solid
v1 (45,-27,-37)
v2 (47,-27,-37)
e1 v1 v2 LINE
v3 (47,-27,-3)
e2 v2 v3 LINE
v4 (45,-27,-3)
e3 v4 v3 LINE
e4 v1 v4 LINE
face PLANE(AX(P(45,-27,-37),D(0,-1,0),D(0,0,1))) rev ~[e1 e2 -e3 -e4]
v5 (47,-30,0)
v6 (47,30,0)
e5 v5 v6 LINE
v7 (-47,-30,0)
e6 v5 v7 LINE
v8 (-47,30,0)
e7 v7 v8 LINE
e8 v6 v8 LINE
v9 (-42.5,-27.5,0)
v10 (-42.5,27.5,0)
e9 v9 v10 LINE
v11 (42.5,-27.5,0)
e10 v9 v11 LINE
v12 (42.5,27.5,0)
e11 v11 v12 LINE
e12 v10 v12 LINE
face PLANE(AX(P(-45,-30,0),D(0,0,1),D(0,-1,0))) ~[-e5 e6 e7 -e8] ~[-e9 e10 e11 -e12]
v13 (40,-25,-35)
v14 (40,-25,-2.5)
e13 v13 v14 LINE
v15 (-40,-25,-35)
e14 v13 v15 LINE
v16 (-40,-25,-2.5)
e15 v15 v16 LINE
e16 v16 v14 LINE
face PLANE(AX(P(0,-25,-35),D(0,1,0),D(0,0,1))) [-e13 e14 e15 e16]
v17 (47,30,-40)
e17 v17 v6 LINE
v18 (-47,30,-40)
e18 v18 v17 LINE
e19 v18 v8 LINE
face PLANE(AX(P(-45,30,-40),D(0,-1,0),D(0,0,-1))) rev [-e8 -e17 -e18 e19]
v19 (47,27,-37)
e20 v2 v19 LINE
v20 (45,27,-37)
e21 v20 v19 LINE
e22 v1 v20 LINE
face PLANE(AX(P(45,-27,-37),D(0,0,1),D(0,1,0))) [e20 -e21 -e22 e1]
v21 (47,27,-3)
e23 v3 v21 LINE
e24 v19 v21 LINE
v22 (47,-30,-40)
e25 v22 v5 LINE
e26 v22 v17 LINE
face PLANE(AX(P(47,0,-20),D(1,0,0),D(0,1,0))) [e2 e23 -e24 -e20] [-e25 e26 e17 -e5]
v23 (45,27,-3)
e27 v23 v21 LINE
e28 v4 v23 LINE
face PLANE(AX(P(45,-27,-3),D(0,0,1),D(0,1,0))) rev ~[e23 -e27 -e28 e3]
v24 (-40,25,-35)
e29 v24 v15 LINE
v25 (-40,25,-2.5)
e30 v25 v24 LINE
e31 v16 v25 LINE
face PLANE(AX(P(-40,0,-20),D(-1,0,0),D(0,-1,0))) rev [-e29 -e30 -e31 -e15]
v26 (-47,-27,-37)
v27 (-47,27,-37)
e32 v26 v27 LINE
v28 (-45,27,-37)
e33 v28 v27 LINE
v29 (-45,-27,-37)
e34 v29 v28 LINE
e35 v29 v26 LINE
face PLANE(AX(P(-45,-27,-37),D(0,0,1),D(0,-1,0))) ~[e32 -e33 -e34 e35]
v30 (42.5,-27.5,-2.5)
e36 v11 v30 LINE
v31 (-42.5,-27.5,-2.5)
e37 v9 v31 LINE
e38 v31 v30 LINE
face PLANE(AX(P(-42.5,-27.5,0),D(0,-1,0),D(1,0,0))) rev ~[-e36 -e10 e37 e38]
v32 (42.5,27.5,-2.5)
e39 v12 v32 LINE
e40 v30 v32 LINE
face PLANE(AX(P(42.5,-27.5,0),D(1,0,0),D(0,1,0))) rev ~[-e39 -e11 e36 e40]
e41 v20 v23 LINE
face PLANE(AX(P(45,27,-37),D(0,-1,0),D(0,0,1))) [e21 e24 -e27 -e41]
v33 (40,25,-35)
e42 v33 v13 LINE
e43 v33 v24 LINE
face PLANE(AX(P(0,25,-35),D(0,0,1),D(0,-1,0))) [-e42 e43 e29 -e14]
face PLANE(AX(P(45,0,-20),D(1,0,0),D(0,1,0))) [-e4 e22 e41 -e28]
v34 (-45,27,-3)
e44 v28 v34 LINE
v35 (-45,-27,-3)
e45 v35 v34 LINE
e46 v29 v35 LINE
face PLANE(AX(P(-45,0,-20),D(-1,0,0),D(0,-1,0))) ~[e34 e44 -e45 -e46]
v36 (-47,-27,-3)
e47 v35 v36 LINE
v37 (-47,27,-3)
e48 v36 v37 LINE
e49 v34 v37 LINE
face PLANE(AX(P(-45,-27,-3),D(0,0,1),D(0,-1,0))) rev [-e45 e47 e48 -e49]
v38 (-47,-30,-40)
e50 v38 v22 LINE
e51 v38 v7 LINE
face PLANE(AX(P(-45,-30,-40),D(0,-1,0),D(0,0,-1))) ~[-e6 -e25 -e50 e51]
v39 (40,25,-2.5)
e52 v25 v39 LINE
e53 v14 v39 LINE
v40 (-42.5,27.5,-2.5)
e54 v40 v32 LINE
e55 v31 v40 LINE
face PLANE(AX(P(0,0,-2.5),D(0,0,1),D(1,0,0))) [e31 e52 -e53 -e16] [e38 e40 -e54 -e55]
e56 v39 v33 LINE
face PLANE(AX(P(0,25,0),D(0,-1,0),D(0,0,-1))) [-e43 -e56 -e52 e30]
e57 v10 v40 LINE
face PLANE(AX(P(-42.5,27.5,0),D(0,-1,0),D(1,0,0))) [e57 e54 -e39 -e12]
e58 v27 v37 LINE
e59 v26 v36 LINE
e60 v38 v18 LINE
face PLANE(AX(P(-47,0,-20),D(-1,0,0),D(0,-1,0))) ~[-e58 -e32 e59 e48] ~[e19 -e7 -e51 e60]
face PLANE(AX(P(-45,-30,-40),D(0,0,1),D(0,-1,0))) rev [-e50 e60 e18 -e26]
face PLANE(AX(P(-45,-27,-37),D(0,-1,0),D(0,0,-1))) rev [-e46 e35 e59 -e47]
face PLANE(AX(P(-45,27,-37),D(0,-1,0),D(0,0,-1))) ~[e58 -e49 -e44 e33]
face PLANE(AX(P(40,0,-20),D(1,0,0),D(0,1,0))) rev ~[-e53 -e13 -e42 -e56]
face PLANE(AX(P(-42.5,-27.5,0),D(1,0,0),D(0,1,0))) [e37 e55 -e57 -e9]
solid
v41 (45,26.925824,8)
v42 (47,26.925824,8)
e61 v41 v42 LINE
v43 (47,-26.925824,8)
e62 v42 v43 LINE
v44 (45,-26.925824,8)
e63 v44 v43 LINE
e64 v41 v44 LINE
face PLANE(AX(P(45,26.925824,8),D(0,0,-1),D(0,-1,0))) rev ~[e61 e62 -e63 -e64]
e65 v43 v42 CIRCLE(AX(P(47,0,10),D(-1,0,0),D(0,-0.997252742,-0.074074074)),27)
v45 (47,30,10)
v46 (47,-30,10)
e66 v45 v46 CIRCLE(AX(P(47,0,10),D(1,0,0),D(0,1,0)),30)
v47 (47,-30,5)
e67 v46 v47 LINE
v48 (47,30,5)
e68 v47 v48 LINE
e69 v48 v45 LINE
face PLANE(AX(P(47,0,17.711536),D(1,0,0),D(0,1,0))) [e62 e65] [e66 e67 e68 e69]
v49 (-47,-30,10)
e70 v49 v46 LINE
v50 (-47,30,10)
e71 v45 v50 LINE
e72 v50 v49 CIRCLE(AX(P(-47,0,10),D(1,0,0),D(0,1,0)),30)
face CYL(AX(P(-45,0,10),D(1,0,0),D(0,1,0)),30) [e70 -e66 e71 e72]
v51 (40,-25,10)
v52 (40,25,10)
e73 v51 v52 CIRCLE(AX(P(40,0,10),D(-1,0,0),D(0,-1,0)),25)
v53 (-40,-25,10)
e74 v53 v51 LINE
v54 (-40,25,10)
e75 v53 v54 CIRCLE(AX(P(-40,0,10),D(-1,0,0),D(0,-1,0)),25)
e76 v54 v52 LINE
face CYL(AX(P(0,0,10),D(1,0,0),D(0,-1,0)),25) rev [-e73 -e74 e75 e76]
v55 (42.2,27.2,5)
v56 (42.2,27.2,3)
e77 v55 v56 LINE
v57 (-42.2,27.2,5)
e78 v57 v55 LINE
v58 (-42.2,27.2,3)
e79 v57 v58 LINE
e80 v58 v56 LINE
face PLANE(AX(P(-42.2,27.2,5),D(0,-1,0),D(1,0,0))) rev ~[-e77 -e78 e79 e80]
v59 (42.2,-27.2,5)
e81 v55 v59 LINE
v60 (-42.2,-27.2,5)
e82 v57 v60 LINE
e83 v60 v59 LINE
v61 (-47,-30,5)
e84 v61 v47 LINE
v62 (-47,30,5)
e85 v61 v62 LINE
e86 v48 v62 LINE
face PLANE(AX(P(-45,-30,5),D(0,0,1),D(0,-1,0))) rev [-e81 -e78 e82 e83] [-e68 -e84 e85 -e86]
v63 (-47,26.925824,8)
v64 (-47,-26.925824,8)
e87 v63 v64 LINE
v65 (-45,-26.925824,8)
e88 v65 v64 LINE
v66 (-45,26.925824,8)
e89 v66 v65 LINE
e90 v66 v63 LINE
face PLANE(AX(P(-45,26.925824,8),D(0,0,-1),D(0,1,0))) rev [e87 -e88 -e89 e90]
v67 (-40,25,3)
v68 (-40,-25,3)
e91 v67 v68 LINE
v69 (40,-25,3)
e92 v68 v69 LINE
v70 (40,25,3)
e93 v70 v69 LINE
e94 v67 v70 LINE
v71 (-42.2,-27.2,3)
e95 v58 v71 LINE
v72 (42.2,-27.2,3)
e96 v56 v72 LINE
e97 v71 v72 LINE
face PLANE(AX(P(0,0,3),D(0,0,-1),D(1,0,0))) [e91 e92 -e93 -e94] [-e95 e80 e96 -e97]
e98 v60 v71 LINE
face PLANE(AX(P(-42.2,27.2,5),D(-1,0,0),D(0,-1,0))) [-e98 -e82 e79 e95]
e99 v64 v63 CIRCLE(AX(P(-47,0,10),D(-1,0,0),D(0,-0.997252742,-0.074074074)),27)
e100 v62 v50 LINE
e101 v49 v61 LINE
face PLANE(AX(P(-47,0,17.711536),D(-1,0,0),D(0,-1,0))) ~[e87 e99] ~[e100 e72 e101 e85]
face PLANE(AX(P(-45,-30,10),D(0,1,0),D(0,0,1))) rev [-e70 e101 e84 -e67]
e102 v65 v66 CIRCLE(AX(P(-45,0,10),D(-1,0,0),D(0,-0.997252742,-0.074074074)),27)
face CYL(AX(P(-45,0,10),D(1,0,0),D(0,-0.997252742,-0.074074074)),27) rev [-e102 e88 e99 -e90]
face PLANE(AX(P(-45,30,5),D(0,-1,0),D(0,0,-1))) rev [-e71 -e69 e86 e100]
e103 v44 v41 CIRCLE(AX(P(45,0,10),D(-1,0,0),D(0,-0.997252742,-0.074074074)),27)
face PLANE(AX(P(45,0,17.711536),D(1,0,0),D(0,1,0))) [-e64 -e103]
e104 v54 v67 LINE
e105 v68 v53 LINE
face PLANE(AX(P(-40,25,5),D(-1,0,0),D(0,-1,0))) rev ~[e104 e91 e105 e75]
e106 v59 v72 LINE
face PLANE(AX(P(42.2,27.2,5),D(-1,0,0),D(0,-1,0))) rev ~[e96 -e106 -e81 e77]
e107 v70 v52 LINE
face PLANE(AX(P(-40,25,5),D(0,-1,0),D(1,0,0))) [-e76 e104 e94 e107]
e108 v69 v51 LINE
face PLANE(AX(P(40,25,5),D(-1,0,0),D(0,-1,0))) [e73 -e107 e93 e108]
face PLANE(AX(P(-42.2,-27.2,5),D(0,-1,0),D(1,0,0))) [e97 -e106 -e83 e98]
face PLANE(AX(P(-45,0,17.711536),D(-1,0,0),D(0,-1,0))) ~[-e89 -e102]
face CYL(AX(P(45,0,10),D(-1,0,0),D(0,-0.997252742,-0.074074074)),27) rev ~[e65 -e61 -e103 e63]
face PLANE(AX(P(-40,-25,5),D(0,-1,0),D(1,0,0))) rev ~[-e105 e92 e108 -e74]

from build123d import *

# Parameters (mm, degrees)
F1_DEPTH  = 40
F2_W      = 60
F2_H      = 40
F3_DEPTH  = 5
F4_W      = 85
F4_H      = 54.9999991059
F4_W_2    = 80
F4_H_2    = 49.9999991059
F5_DEPTH  = 2.5
F8_DEPTH  = 40
F10_DEPTH = 5
F11_W     = 84.4
F11_H     = 54.4
F11_W_2   = 80
F11_H_2   = 50
F12_DEPTH = 2
F14_DEPTH = 2
F15_W     = 60
F15_H     = 40
F15_W_2   = 54
F15_H_2   = 34
F16_DEPTH = 2


# Not quite as in the source:
# - a pattern or mirror of a feature is missing from the dataset's text; its kind, count and spacing are read off the source's solid


with BuildPart() as f1:
    # F0 (on Right) → F1 (new body, symmetric)
    with BuildSketch(Plane.YZ):
        Polygon((-24.999999553, 0), (-30, 0), (-30, -40), (30, -40), (30, 0), (24.999999553, 0), (24.999999553, -34.999999553), (-24.999999553, -34.999999553), align=None)
    extrude(amount=F1_DEPTH, both=True)

    # F2 (on face) → F3 (join)
    with BuildSketch(Plane.YZ.offset(40)):
        with Locations((0, -20)):
            Rectangle(F2_W, F2_H)
    f3 = extrude(amount=F3_DEPTH)

    # F3_copies: F3 across plane
    add(f3.mirror(Plane(origin=(0, 0, 0), x_dir=(0, 0, -1), z_dir=(-1, 0, 0))))

    # F4 (on face) → F5 (cut)
    with BuildSketch(Plane.XY):
        Rectangle(F4_W, F4_H)
        Rectangle(F4_W_2, F4_H_2, mode=Mode.SUBTRACT)
    extrude(amount=-F5_DEPTH, mode=Mode.SUBTRACT)

    # F15 (on face) → F16 (join)
    with BuildSketch(Plane.YZ.offset(45)):
        with Locations((0, -20)):
            Rectangle(F15_W, F15_H)
        with Locations((0, -20)):
            Rectangle(F15_W_2, F15_H_2, mode=Mode.SUBTRACT)
    f16 = extrude(amount=F16_DEPTH)

    # F16_copies: F16 across plane
    add(f16.mirror(Plane(origin=(0, 0, 0), x_dir=(0, 0, -1), z_dir=(-1, 0, 0))))


with BuildPart() as f8:
    # F7 (on Right) → F8 (new body, symmetric)
    with BuildSketch(Plane.YZ):
        with BuildLine():
            Line((-30, 10), (-30, 5))
            Line((-30, 5), (-25, 5))
            Line((-25, 5), (-25, 10))
            ThreePointArc((-25, 10), (0, 35), (25, 10))
            Line((25, 10), (25, 5))
            Line((25, 5), (30, 5))
            Line((30, 5), (30, 10))
            ThreePointArc((30, 10), (0, 40), (-30, 10))
        make_face()
    extrude(amount=F8_DEPTH, both=True)

    # F9 (on face) → F10 (join)
    with BuildSketch(Plane.YZ.offset(40)):
        with BuildLine():
            Line((30, 5), (30, 10))
            ThreePointArc((30, 10), (0, 40), (-30, 10))
            Line((-30, 10), (-30, 5))
            Line((-30, 5), (30, 5))
        make_face()
    f10 = extrude(amount=F10_DEPTH)

    # F10_copies: F10 across plane
    add(f10.mirror(Plane(origin=(0, 0, 0), x_dir=(0, 0, -1), z_dir=(-1, 0, 0))))

    # F11 (on face) → F12 (join)
    with BuildSketch(Plane(origin=(0, 0, 5), x_dir=(1, 0, 0), z_dir=(0, 0, -1))):
        Rectangle(F11_W, F11_H)
        Rectangle(F11_W_2, F11_H_2, mode=Mode.SUBTRACT)
    extrude(amount=F12_DEPTH)

    # F13 (on face) → F14 (join)
    with BuildSketch(Plane.YZ.offset(45)):
        with BuildLine():
            ThreePointArc((30, 10), (0, 40), (-30, 10))
            Line((-30, 10), (-30, 5))
            Line((-30, 5), (30, 5))
            Line((30, 5), (30, 10))
        make_face()
        with BuildLine():
            ThreePointArc((-26.9258240357, 8), (0, 37), (26.9258240357, 8))
            Line((26.9258240357, 8), (-26.9258240357, 8))
        make_face(mode=Mode.SUBTRACT)
    f14 = extrude(amount=F14_DEPTH)

    # F14_copies: F14 across plane
    add(f14.mirror(Plane(origin=(0, 0, 0), x_dir=(0, 0, -1), z_dir=(-1, 0, 0))))


solid = Compound([f1.part, f8.part])
